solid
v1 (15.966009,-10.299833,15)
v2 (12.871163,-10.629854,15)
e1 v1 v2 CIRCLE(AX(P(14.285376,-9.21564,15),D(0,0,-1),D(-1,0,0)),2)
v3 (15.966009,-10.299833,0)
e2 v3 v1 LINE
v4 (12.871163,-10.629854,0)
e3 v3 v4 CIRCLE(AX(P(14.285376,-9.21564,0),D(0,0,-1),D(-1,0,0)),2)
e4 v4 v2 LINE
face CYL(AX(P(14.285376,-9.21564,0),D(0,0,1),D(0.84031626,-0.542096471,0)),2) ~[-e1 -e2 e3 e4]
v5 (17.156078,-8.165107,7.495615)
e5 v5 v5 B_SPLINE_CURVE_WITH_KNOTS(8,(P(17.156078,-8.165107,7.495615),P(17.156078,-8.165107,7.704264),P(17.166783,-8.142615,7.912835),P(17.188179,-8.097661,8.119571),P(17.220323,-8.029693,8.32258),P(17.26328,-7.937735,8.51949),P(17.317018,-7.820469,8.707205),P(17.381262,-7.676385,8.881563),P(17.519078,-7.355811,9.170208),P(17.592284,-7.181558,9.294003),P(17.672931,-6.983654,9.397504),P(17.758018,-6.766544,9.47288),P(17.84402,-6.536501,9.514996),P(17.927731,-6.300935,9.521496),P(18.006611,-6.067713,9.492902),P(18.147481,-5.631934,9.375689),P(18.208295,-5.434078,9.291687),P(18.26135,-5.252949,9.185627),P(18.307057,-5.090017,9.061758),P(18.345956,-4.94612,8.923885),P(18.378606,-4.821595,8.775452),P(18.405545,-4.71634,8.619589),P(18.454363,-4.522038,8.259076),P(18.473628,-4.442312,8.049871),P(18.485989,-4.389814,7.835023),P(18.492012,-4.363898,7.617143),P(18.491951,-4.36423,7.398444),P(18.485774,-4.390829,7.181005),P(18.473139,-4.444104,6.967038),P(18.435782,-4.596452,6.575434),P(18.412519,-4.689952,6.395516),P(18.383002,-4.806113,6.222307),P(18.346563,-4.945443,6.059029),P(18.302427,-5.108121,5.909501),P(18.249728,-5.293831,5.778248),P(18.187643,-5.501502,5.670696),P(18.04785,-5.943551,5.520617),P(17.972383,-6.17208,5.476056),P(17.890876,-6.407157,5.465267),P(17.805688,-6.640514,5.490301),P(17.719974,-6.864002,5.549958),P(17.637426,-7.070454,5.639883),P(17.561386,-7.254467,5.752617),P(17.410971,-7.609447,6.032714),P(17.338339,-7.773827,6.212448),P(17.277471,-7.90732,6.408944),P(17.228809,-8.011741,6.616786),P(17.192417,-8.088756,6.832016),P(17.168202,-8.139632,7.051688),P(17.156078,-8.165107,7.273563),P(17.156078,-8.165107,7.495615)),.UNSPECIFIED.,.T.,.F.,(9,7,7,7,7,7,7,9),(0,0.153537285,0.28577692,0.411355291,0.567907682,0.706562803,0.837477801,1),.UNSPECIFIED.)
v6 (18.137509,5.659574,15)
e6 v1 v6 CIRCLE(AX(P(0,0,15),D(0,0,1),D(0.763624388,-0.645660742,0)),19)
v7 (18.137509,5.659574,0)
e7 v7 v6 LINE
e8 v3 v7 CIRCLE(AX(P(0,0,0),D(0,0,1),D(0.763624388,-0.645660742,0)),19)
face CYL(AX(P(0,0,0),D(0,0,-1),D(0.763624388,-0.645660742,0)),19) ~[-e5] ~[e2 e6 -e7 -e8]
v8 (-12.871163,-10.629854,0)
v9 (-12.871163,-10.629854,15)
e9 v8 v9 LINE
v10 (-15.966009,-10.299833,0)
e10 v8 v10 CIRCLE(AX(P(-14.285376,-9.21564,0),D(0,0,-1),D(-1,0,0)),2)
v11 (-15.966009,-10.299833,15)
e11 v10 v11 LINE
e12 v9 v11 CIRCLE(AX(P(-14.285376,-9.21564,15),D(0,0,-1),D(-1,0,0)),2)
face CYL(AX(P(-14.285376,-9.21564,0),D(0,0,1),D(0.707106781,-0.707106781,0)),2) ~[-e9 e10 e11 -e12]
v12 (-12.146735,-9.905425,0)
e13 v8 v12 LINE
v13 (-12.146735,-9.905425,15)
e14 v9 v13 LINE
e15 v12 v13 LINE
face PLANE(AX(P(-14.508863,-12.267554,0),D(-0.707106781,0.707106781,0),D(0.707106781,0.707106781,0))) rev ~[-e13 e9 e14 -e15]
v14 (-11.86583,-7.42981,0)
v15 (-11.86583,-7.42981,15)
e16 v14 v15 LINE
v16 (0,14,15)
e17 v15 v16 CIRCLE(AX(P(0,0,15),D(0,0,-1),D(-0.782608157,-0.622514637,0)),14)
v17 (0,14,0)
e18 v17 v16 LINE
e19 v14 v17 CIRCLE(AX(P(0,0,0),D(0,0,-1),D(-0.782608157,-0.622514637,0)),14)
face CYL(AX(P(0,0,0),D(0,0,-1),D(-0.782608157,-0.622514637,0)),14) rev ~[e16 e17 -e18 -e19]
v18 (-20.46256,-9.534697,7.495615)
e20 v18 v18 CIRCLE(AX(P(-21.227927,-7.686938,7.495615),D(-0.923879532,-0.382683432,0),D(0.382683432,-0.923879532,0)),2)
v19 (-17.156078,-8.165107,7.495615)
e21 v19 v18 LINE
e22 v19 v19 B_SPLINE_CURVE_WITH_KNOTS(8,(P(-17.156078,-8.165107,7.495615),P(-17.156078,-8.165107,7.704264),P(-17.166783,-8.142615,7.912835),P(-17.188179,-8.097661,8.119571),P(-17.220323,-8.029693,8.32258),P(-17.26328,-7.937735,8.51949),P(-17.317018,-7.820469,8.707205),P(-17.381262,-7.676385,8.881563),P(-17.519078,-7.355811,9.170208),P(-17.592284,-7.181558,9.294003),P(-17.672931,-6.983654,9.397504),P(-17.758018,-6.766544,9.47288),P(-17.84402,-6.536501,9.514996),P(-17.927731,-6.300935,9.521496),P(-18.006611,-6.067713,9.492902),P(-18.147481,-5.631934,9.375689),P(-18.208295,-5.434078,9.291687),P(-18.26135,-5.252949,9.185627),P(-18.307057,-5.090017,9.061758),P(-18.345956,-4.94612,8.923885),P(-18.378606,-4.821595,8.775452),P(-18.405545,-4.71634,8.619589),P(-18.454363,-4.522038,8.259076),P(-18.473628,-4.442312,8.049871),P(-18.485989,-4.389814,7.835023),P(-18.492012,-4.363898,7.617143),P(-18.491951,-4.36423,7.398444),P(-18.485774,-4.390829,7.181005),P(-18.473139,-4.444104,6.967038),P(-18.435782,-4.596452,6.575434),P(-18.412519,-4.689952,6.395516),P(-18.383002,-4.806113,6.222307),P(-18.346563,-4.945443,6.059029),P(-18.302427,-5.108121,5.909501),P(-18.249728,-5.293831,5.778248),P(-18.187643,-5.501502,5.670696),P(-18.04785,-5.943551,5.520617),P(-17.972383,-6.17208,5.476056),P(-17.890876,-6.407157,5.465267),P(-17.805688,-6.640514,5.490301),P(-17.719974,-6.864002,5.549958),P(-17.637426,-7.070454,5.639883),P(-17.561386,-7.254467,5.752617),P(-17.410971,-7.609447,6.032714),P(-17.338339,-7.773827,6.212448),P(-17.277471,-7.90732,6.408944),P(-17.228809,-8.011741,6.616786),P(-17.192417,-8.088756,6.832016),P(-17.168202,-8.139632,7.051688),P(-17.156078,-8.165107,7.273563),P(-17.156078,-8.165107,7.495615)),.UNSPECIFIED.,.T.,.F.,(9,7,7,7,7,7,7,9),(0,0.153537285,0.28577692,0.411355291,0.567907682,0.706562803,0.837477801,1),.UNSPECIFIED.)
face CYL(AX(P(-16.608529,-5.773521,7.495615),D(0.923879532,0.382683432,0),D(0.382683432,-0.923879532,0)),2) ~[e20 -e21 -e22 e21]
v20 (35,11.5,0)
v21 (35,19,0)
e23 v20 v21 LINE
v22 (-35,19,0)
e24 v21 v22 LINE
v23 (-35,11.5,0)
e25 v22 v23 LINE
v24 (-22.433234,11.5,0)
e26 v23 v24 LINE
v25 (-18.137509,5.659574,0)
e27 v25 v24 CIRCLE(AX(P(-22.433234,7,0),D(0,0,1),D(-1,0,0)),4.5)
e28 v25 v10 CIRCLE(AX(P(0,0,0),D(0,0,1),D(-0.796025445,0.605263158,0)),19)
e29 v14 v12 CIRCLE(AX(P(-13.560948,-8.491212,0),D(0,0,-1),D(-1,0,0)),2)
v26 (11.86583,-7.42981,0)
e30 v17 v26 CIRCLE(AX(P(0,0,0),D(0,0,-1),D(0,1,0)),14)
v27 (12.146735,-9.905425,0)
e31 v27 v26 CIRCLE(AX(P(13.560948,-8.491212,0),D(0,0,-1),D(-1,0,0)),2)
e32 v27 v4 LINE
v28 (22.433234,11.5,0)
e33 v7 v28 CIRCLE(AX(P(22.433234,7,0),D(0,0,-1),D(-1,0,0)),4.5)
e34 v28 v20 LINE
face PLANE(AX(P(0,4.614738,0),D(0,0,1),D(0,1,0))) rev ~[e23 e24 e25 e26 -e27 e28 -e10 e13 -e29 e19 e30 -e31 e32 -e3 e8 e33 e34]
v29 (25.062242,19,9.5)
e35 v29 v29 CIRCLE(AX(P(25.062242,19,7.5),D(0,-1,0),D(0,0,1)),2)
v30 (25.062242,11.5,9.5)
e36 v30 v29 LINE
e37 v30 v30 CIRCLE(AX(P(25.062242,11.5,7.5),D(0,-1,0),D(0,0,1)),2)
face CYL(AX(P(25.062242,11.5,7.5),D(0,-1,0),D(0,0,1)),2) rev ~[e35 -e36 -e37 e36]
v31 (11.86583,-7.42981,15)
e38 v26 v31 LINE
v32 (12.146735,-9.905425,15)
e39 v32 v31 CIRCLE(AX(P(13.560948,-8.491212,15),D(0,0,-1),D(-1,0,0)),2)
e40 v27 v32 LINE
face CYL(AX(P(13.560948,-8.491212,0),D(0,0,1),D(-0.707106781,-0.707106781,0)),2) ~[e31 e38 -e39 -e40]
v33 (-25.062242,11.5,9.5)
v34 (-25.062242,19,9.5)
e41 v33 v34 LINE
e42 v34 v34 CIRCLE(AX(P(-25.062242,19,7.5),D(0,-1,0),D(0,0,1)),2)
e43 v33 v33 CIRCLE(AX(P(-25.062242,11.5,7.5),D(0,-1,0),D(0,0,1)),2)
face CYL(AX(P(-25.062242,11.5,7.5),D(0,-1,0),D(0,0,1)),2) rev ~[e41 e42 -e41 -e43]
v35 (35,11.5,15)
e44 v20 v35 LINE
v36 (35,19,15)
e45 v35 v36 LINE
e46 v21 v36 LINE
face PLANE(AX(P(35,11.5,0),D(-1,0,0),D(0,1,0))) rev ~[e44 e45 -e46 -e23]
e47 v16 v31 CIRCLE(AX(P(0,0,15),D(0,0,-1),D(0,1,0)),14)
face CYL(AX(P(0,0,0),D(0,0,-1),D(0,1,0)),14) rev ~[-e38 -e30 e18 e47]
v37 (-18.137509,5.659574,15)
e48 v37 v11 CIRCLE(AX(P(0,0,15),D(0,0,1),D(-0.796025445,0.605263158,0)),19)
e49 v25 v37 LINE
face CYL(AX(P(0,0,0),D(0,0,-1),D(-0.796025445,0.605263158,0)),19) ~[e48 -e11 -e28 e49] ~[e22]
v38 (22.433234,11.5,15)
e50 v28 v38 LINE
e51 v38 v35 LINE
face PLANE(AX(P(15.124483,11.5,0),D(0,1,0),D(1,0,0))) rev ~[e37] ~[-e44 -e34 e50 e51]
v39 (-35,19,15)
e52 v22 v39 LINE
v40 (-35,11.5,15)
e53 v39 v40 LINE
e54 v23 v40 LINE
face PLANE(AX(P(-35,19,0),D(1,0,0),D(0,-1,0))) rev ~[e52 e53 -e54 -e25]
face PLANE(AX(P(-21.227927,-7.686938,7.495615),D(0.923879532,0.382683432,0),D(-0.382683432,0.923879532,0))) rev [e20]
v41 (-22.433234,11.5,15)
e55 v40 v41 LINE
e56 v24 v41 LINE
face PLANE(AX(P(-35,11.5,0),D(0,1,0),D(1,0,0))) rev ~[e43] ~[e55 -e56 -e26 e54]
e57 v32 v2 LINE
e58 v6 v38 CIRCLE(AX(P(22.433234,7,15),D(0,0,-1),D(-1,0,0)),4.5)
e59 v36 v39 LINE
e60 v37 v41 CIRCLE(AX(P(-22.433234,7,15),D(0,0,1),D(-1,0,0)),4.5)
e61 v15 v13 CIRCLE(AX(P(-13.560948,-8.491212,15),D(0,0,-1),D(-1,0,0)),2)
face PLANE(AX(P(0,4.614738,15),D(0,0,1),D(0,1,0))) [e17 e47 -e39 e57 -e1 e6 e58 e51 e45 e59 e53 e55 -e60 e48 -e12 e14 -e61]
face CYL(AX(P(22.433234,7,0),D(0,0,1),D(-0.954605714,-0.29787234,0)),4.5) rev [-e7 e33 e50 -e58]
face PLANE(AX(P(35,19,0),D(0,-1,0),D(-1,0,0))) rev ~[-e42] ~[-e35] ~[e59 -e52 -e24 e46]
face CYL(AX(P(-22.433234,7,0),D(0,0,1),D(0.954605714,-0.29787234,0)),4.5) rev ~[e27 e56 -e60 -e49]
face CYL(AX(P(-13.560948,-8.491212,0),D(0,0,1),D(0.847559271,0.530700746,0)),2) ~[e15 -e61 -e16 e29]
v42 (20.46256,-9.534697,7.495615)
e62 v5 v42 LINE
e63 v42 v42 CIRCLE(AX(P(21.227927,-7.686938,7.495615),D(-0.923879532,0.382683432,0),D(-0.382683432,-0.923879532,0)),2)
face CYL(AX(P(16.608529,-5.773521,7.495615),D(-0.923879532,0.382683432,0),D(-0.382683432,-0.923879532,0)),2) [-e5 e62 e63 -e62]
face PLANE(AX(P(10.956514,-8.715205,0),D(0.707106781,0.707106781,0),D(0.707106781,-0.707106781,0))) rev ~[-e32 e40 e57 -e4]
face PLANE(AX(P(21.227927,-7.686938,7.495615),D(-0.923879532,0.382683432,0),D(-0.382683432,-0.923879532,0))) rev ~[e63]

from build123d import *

# Parameters (mm, degrees)
F1_DEPTH  = 15
F2_R      = 2
F3_DEPTH  = 7.5
F4_ANGLE  = 90
F5_R      = 4.5
F6_R      = 2
F10_R     = 2
F11_DEPTH = 5


# Not quite as in the source:
# - a pattern or mirror of a feature is missing from the dataset's text; its kind, count and spacing are read off the source's solid


with BuildPart() as f1:
    # F0 (on Right) → F1 (new body)
    with BuildSketch(Plane.YZ):
        with BuildLine():
            ThreePointArc((-8.7152049129, 10.9565141959), (6.0822336037, 12.6097753505), (14, 0))
            ThreePointArc((14, 0), (6.0822336037, -12.6097753505), (-8.7152049129, -10.9565141959))
            Line((-8.7152049129, -10.9565141959), (-12.2675540951, -14.5088633781))
            ThreePointArc((-12.2675540951, -14.5088633781), (-0.4919673203, -18.993629673), (11.5, -15.1244834623))
            ThreePointArc((11.5, -15.1244834623), (17.0220445305, -8.4409715081), (19, 0))
            ThreePointArc((19, 0), (17.0220445305, 8.4409715081), (11.5, 15.1244834623))
            ThreePointArc((11.5, 15.1244834623), (-0.4919673203, 18.993629673), (-12.2675540951, 14.5088633781))
            Line((-12.2675540951, 14.5088633781), (-8.7152049129, 10.9565141959))
        make_face()
        with BuildLine():
            Line((11.5, 35), (11.5, 15.1244834623))
            ThreePointArc((11.5, 15.1244834623), (17.0220445305, 8.4409715081), (19, 0))
            Line((19, 0), (19, 35))
            Line((19, 35), (11.5, 35))
        make_face()
        with BuildLine():
            ThreePointArc((19, 0), (17.0220445305, -8.4409715081), (11.5, -15.1244834623))
            Line((11.5, -15.1244834623), (11.5, -35))
            Line((11.5, -35), (19, -35))
            Line((19, -35), (19, 0))
        make_face()
    extrude(amount=F1_DEPTH)

    # F2 (on face) → F3 (cut, through all)
    with BuildSketch(Plane.XZ.offset(-11.5)):
        with Locations((7.5, 25.0622417311)):
            Circle(F2_R)
        with Locations((7.5, -25.0622417311)):
            Circle(F2_R)
    extrude(amount=-F3_DEPTH, mode=Mode.SUBTRACT)


with BuildPart() as f1_1:
    # F4: moved
    add(f1.part.rotate(Axis((0, -7, 0), (0, -1, 0)), F4_ANGLE))

    # F5
    f5_edges = [f1_1.edges().sort_by_distance(p)[0] for p in [
        (-15.124483, 11.5, 7.5),
        (15.124483, 11.5, 7.5),
    ]]
    fillet(f5_edges, radius=F5_R)

    # F6
    f6_edges = [f1_1.edges().sort_by_distance(p)[0] for p in [
        (10.956514, -8.715205, 7.5),
        (-10.956514, -8.715205, 7.5),
        (-14.508863, -12.267554, 7.5),
        (14.508863, -12.267554, 7.5),
    ]]
    fillet(f6_edges, radius=F6_R)

    # F10 (on line) → F11 (join)
    with BuildSketch(Plane(origin=(16.2175144213, -6.7175144213, 0), x_dir=(-0.3826834324, -0.9238795325, 0), z_dir=(-0.9238795325, 0.3826834324, 0))):
        with Locations((-1.0217712261, 7.4956147)):
            Circle(F10_R)
    f11 = extrude(amount=-F11_DEPTH)

    # F11_copies: F11 across plane
    add(f11.mirror(Plane(origin=(0, 0, 0), x_dir=(0, 0, -1), z_dir=(-1, 0, 0))))


solid = f1_1.part
